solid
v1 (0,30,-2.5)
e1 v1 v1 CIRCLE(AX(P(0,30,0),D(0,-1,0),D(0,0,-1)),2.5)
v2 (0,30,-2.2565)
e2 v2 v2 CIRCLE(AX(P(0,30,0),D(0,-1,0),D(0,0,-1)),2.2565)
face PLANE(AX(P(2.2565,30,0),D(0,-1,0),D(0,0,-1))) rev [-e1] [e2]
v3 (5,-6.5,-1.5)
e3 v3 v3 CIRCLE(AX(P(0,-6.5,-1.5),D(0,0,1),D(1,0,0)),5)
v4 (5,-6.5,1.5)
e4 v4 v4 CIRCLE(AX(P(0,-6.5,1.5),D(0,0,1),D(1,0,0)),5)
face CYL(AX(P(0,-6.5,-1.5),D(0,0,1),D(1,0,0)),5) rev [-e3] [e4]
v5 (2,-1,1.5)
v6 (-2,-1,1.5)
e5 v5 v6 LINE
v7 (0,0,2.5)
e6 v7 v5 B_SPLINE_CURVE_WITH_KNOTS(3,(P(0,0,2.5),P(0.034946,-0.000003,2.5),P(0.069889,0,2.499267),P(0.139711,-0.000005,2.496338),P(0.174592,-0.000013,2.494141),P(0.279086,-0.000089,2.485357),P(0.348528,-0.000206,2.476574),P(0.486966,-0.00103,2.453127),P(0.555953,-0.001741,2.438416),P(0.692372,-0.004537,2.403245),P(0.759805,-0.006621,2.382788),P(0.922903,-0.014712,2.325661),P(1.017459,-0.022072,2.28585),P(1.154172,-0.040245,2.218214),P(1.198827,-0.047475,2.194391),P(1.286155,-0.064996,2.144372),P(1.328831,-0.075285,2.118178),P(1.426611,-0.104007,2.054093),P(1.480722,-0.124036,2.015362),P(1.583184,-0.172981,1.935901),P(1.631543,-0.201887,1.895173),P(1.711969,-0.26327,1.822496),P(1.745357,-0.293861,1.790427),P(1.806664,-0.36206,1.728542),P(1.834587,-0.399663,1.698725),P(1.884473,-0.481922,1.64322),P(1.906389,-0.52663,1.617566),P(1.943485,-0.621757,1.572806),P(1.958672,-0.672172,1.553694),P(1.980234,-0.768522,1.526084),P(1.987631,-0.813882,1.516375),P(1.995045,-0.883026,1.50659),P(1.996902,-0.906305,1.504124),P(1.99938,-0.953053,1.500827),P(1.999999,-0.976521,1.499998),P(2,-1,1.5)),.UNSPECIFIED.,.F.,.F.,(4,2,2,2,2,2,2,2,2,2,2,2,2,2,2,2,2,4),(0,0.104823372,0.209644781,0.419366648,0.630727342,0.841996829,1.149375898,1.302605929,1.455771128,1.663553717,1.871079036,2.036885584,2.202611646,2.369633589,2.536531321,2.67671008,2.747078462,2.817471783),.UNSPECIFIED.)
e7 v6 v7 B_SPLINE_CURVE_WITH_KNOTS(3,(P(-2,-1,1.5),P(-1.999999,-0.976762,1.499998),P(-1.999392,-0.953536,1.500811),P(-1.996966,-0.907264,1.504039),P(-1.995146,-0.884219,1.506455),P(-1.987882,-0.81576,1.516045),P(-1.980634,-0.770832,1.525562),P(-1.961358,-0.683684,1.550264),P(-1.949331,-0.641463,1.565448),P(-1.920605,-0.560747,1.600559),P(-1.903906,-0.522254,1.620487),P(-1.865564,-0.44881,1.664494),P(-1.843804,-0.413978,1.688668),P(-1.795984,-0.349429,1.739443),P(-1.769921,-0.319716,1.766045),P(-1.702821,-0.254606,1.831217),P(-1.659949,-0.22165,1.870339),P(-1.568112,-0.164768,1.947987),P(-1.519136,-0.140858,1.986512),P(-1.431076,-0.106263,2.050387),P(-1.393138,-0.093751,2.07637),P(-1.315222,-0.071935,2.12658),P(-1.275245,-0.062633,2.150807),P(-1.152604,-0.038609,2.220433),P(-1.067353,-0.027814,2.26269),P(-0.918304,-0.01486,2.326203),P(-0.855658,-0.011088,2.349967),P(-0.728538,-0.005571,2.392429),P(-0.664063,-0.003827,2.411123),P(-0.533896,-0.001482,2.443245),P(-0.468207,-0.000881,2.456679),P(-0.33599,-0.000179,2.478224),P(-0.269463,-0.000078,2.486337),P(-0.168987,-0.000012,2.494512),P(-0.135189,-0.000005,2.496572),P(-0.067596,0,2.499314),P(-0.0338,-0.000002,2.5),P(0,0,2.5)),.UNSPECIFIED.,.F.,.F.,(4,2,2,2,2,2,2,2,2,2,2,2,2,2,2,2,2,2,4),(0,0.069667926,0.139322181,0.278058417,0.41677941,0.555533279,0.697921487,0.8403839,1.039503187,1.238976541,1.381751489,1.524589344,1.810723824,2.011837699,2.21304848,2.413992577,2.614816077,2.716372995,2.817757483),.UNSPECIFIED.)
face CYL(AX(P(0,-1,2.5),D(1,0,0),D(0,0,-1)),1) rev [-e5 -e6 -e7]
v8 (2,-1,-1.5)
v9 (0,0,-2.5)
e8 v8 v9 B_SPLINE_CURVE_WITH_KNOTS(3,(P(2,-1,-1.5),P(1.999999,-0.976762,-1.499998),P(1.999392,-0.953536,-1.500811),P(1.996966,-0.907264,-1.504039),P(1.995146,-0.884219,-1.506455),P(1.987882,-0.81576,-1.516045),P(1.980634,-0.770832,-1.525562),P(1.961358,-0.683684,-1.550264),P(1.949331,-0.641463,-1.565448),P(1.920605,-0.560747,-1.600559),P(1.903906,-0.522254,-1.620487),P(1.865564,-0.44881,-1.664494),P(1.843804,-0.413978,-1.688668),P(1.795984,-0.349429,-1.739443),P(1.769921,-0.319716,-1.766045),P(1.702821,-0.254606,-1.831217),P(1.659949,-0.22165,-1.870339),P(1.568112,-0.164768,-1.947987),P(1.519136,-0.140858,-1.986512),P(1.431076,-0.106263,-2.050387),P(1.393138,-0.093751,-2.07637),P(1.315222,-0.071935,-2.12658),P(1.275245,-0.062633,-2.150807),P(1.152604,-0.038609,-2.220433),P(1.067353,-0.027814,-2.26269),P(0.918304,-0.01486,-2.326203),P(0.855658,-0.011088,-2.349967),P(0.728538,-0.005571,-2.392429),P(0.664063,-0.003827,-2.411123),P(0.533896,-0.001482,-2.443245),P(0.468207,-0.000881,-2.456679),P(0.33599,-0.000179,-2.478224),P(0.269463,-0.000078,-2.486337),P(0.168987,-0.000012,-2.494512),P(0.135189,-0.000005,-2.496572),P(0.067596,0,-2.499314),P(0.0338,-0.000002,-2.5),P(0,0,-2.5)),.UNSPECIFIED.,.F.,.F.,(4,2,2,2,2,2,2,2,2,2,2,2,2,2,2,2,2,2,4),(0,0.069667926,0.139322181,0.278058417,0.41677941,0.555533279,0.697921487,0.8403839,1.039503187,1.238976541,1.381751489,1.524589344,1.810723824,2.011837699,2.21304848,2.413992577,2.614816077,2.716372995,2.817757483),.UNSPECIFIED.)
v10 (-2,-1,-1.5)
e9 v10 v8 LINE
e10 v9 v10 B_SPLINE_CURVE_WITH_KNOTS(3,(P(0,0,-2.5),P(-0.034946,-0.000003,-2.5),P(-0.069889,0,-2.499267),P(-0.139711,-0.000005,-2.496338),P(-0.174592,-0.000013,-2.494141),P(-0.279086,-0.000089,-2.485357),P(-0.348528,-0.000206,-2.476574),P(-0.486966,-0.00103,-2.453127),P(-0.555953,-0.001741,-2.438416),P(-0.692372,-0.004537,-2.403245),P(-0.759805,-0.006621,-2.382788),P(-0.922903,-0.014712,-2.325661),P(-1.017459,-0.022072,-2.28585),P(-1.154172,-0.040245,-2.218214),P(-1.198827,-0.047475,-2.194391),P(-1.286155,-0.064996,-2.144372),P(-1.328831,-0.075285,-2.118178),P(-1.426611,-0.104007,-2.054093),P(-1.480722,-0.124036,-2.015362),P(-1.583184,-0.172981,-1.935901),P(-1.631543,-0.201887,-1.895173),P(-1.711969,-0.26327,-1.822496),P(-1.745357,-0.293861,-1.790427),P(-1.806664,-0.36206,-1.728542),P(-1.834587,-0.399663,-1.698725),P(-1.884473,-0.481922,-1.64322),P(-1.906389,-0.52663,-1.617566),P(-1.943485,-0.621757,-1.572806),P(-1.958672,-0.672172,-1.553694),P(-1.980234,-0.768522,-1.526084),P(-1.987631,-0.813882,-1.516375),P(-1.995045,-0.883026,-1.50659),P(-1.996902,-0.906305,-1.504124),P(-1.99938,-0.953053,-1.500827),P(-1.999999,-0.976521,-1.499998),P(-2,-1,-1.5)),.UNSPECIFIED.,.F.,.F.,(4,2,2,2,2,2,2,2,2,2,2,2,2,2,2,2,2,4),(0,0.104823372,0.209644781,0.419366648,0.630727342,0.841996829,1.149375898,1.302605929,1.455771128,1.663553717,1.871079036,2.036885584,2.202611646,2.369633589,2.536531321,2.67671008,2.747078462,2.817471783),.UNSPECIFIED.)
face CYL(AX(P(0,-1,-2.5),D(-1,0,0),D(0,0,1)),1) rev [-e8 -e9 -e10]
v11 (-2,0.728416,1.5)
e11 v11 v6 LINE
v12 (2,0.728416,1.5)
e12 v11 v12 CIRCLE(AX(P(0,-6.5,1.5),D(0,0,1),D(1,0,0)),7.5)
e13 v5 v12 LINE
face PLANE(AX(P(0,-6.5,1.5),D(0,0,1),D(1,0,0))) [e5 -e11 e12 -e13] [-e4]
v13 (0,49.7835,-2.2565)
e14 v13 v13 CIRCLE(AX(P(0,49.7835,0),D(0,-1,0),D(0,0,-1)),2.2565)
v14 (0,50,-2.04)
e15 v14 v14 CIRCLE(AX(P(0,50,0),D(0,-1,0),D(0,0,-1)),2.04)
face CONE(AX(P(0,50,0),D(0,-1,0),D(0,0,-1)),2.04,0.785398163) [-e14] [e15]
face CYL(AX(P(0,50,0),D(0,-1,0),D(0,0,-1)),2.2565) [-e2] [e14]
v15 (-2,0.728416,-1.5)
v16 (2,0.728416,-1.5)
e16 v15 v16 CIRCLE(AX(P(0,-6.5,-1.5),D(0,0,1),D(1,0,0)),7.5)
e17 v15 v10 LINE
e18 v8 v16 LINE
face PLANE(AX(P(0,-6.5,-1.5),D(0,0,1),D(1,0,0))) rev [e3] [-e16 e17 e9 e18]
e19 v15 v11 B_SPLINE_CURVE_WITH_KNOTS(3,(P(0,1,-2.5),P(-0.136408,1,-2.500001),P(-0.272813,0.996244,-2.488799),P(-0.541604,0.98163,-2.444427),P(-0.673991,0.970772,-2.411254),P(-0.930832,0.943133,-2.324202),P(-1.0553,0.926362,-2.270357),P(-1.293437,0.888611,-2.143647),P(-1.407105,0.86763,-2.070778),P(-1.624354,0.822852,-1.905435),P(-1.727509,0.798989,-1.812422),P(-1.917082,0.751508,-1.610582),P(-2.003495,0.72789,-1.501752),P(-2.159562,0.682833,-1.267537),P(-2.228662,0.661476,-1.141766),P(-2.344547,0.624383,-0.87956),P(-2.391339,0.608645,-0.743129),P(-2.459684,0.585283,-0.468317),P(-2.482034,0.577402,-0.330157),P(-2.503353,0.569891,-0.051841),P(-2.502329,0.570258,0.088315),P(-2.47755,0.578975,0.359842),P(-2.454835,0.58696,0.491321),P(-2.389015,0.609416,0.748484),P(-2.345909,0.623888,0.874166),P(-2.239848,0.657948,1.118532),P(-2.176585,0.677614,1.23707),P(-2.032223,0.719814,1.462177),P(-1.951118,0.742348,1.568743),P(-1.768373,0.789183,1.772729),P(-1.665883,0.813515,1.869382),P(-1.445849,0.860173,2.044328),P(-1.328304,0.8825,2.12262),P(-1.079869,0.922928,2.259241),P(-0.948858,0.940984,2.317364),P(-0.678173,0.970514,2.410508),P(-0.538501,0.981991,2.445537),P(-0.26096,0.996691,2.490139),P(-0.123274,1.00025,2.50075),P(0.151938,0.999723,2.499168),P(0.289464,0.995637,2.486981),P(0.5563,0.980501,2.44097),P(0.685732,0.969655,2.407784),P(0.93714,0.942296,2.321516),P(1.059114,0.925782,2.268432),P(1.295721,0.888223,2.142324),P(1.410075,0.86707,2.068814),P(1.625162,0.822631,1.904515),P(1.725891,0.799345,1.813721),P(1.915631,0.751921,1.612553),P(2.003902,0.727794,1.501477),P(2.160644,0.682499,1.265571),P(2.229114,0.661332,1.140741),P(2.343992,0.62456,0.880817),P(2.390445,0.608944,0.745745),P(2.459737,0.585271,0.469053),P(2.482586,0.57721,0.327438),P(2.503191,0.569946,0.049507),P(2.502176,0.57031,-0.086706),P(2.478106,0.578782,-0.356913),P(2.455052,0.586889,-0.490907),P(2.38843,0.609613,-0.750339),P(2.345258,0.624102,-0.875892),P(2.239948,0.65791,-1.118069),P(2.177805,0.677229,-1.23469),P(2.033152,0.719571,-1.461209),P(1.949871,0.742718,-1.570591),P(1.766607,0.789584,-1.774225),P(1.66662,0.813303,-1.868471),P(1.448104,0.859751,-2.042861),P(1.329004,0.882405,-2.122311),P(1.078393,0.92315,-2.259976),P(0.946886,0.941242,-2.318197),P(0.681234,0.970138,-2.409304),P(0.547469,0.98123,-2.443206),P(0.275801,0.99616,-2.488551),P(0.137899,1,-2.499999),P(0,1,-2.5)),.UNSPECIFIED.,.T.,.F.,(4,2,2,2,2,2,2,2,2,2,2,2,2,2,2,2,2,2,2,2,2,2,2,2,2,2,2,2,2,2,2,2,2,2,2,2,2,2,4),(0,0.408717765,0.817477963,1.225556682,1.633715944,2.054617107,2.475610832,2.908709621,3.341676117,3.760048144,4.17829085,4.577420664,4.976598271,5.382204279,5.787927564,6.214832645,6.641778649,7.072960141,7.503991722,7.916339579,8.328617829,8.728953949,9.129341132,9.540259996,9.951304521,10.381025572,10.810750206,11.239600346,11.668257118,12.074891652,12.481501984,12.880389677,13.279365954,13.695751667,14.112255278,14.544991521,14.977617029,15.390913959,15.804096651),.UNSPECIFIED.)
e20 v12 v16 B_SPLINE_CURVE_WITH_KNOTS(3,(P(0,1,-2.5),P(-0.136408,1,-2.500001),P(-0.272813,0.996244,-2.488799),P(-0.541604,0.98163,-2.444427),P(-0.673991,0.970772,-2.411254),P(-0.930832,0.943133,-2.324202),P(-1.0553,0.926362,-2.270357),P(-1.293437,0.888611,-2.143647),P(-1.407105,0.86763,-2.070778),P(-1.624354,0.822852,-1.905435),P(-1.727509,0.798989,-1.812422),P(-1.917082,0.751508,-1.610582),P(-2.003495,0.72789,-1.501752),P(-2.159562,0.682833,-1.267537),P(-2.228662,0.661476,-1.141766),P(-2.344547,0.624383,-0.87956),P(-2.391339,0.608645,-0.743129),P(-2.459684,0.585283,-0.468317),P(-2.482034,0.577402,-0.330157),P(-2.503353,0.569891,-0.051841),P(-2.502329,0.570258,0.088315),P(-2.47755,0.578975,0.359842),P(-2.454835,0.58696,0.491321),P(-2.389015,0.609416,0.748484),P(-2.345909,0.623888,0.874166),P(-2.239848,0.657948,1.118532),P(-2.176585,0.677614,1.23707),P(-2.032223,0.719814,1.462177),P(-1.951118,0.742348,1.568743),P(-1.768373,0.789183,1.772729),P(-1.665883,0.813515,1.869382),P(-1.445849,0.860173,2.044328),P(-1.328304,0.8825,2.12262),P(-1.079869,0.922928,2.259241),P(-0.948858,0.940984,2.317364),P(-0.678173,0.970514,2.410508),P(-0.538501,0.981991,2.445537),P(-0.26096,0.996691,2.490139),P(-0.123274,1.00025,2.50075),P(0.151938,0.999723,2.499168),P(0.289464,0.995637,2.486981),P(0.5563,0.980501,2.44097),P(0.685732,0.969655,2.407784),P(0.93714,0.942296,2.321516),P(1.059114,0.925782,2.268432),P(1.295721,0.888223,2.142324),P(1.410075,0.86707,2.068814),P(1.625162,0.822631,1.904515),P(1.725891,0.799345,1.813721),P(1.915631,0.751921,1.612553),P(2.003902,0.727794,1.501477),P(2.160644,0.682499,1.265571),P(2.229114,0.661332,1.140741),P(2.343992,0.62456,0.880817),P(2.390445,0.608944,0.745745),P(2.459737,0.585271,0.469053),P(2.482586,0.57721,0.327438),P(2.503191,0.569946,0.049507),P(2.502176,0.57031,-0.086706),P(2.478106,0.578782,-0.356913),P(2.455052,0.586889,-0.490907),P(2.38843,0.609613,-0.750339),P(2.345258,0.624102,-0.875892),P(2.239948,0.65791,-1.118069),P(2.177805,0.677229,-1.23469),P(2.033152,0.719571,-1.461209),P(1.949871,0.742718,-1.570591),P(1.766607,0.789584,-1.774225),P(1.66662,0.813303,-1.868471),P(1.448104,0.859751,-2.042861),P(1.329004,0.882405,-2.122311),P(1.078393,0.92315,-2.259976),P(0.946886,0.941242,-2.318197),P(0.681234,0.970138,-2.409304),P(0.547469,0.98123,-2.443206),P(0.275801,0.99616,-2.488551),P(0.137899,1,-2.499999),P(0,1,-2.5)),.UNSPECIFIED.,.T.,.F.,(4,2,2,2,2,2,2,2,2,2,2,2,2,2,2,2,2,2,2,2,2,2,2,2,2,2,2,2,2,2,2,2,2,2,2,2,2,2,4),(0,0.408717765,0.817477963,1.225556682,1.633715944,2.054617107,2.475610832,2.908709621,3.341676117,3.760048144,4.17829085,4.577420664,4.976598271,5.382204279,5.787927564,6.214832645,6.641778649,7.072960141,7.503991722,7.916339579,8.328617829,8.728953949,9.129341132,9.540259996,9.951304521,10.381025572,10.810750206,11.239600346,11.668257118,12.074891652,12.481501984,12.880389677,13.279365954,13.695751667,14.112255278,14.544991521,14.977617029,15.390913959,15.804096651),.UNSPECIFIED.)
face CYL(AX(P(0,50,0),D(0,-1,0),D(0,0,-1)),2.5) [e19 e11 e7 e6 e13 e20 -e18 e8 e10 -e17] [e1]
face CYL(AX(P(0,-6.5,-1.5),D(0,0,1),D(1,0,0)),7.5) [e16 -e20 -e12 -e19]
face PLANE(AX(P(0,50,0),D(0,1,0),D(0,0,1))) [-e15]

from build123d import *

# Parameters (mm, degrees)
SKETCH1_R                = 2.5
BOSS_EXTRUDE1_DEPTH      = 50
BOSS_EXTRUDE2_DEPTH      = 1.5
BOSS_EXTRUDE2_DEPTH_BACK = 1.5
SKETCH2_R                = 7.5
SKETCH2_R_2              = 5
FILLET1_R                = 1
FILLET2_R                = 1


# Read off the part's stored shape, not the designer's step: M5x0.75 Machine Threads Stud1
with BuildPart() as part:
    # Sketch1 → Boss-Extrude1 (new body)
    with BuildSketch(Plane(origin=(0, 0, 0), x_dir=(1, 0, 0), z_dir=(0, 1, 0))):
        with Locations(Location((0, 0, 0), (0, 0, 270))):
            Circle(SKETCH1_R)
    extrude(amount=BOSS_EXTRUDE1_DEPTH)

    # Sketch2 → Boss-Extrude2 (add, two sides: drawn at the far end of the back side and taken through both)
    with BuildSketch(Plane.XY.offset(-BOSS_EXTRUDE2_DEPTH_BACK)):
        with Locations((0, -6.5)):
            Circle(SKETCH2_R)
        with Locations((0, -6.5)):
            Circle(SKETCH2_R_2, mode=Mode.SUBTRACT)
    extrude(amount=BOSS_EXTRUDE2_DEPTH + BOSS_EXTRUDE2_DEPTH_BACK)

    # Fillet1
    fillet1_edges = [part.edges().sort_by_distance(p)[0] for p in [
        (0, 0, -1.5),
    ]]
    fillet(fillet1_edges, radius=FILLET1_R - 0.0001)  # a hair under: the kernel refuses the full size

    # Fillet2
    fillet2_edges = [part.edges().sort_by_distance(p)[0] for p in [
        (0, 0, 1.5),
    ]]
    fillet(fillet2_edges, radius=FILLET2_R - 0.0001)  # a hair under: the kernel refuses the full size

    # M5x0.75 Machine Threads Stud1 outline → M5x0.75 Machine Threads Stud1 (revolve, cut)
    with BuildSketch(Plane.XY):
        Polygon((2.5, 50), (2.04, 50), (2.2565, 49.7835), (2.2565, 30), (2.5, 30), align=None)
    revolve(axis=Axis((0, 0, 0), (0, 1, 0)), mode=Mode.SUBTRACT)


solid = part.part
